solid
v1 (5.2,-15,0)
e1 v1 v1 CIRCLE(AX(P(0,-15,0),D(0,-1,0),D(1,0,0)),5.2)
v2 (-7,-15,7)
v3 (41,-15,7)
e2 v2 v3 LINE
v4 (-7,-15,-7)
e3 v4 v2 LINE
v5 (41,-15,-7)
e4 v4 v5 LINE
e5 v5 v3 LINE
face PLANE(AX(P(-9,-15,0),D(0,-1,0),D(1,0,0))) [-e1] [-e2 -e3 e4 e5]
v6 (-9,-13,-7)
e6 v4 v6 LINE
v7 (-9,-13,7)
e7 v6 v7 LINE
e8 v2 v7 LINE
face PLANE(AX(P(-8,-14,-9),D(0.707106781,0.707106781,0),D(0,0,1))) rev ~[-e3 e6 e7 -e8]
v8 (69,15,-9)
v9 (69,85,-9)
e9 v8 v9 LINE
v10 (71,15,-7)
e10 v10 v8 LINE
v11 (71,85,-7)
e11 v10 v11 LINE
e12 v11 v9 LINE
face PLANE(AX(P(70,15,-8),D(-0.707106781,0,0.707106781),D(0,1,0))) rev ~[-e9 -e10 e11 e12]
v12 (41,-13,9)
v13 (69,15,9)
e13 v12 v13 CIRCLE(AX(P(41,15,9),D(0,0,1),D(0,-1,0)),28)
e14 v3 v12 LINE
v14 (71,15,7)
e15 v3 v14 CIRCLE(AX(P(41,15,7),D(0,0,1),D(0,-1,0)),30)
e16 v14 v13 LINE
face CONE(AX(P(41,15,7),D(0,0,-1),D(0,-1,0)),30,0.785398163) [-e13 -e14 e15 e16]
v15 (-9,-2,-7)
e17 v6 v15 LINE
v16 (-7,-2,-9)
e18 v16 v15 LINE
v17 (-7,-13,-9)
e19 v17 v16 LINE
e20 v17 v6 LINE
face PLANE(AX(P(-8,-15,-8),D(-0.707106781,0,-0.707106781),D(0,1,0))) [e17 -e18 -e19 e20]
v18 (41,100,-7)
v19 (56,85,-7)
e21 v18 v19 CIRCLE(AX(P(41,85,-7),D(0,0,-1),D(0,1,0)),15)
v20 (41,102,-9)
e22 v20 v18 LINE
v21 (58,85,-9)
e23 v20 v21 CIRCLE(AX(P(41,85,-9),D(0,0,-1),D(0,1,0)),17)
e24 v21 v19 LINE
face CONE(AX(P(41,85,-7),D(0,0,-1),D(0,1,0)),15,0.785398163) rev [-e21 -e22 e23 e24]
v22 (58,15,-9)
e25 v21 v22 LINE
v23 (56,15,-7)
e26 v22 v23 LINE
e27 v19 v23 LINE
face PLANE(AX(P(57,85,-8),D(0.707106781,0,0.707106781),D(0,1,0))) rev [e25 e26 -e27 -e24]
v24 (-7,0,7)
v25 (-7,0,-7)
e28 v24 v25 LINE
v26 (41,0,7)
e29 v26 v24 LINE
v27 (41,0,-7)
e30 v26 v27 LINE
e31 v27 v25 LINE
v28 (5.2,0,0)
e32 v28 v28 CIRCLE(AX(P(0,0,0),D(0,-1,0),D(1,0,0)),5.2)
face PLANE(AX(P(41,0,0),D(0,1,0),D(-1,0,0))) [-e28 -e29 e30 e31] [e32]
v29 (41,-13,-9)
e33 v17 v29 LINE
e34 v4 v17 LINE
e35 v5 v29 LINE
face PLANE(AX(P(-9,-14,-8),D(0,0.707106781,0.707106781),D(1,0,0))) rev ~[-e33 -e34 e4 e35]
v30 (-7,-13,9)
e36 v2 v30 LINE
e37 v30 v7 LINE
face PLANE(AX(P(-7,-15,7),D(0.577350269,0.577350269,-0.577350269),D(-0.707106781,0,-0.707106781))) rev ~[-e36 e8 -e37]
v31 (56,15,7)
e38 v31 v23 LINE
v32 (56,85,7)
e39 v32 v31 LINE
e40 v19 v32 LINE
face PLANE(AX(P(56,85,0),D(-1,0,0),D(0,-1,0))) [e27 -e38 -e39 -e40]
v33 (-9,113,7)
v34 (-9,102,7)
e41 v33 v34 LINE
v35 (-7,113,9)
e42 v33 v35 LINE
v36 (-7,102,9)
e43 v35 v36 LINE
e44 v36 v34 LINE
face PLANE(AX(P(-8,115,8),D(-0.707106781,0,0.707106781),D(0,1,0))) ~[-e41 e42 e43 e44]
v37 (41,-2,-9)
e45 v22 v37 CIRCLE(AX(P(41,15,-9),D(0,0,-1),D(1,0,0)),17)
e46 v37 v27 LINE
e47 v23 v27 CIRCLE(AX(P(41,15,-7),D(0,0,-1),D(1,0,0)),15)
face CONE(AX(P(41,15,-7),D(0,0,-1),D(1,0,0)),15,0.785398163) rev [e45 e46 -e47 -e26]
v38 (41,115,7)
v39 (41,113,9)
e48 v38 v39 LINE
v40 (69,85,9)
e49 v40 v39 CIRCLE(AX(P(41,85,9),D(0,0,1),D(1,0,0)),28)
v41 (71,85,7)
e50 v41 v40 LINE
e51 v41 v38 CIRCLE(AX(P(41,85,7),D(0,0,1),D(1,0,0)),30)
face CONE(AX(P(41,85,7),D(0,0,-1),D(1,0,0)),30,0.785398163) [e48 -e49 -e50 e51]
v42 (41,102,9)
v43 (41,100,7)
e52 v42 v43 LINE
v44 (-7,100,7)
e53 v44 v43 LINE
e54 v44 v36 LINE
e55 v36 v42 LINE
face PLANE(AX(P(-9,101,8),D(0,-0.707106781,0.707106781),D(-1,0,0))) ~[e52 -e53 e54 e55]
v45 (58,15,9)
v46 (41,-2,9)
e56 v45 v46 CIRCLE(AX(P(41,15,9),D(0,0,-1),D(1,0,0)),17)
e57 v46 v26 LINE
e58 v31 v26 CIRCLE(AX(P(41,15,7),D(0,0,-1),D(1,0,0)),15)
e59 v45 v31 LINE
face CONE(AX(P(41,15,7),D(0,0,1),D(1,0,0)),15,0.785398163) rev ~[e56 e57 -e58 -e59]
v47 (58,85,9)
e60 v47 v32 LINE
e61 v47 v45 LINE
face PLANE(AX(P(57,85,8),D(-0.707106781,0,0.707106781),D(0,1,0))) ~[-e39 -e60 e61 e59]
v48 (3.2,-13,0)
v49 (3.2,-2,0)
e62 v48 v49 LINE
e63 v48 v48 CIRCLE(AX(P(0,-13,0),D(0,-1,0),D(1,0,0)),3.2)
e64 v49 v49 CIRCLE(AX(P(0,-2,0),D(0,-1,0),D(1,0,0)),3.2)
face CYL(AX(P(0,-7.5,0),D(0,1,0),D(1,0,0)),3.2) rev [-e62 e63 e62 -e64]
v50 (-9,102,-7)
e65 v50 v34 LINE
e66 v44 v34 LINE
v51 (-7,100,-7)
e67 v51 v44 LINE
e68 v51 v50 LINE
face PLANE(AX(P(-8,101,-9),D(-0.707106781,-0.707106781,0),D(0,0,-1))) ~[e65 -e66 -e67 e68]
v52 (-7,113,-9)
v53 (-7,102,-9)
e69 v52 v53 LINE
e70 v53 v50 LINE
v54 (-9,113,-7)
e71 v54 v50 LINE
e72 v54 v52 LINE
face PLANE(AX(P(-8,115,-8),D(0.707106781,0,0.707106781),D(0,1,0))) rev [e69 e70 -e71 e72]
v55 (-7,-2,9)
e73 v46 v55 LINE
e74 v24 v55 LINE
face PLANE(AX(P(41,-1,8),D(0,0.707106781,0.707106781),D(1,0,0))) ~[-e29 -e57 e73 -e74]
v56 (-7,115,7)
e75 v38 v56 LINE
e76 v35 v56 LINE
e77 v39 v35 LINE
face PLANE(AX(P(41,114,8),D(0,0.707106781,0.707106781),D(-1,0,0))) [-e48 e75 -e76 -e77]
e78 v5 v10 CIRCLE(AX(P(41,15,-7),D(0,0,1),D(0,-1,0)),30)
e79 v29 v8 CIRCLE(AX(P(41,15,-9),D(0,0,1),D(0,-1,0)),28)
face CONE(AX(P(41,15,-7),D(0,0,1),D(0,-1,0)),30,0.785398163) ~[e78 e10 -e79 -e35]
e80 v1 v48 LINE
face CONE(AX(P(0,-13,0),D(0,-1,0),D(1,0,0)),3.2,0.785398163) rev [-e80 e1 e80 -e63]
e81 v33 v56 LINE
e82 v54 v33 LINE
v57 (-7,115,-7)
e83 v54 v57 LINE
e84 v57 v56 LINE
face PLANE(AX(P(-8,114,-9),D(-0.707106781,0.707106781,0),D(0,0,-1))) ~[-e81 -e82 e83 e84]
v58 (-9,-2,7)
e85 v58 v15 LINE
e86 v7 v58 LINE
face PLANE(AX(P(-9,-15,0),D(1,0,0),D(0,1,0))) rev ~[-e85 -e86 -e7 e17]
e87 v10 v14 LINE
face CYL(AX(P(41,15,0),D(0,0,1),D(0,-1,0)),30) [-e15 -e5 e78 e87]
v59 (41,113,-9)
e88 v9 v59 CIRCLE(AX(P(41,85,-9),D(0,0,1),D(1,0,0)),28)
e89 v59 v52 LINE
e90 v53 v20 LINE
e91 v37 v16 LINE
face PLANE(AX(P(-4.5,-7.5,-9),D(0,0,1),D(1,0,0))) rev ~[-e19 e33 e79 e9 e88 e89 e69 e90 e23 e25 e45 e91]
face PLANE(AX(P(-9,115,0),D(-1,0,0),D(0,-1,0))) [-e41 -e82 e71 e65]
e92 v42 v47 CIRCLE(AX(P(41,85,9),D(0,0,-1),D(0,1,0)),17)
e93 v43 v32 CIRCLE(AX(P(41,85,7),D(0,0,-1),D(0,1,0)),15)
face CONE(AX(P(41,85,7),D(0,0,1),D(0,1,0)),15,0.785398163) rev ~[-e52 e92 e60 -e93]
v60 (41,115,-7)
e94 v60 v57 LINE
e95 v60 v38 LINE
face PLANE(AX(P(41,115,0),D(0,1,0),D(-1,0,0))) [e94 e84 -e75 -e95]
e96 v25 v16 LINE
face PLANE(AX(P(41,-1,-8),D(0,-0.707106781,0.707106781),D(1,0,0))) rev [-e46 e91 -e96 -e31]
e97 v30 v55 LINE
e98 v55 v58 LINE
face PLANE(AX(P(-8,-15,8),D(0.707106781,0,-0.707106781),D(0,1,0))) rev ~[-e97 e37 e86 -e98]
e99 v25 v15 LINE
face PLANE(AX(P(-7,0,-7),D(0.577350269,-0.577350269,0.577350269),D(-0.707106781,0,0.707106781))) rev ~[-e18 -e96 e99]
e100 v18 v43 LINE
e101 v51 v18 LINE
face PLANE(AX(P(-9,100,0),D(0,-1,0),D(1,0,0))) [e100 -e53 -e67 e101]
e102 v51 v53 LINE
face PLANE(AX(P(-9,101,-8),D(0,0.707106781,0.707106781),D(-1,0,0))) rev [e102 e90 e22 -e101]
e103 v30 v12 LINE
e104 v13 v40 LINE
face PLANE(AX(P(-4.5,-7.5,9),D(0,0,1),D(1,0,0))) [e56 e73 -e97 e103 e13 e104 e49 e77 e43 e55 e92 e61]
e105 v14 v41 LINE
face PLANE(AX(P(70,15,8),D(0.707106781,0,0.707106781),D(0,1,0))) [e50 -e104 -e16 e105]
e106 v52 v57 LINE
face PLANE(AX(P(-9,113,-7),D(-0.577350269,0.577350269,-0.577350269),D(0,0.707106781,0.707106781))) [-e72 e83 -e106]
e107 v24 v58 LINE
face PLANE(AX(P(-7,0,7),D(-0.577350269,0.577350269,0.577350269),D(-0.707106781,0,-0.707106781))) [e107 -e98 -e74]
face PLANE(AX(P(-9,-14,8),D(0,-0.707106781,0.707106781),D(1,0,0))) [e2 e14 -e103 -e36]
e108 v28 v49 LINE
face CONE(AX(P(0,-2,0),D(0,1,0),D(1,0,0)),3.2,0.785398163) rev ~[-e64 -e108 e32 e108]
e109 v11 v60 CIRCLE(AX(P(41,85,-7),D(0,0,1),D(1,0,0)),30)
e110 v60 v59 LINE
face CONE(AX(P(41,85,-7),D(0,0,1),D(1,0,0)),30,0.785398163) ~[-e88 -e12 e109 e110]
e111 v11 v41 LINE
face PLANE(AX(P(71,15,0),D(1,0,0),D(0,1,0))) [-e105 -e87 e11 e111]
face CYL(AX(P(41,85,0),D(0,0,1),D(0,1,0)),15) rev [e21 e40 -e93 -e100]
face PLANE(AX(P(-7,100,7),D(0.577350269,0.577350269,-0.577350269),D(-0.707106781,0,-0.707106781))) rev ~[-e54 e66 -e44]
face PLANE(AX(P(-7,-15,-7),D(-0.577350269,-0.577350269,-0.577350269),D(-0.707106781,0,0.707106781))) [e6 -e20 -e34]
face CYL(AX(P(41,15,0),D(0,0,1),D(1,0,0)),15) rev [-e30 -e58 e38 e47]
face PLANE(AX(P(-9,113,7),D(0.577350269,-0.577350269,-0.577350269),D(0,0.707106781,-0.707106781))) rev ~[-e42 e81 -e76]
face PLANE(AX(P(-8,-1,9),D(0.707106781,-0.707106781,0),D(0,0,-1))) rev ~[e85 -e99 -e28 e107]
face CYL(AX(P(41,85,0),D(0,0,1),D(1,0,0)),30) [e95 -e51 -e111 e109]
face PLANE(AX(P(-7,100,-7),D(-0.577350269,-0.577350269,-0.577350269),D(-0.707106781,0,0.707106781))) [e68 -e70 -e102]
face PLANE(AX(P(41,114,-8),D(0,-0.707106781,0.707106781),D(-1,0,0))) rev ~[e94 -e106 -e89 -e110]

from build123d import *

# Parameters (mm, degrees)
F0_W     = 9
F0_H     = 15
F0_W_2   = 3.2
F1_DEPTH = 9
F3_SIZE  = 2


# Not quite as in the source:
# - a feature names something its author has since deleted; it is built from what else it names


with BuildPart() as f1:
    # F0 (on Top) → F1 (new body, symmetric)
    with BuildSketch(Plane.XY):
        with Locations((-4.5, -7.5)):
            Rectangle(F0_W, F0_H)
        with Locations((1.6, -7.5)):
            Rectangle(F0_W_2, F0_H)
        with BuildLine():
            Line((41, 0), (3.2, 0))
            Line((3.2, 0), (3.2, -15))
            Line((3.2, -15), (41, -15))
            ThreePointArc((41, -15), (62.2132034356, -6.2132034356), (71, 15))
            Line((71, 15), (71, 85))
            ThreePointArc((71, 85), (62.2132034356, 106.2132034356), (41, 115))
            Line((41, 115), (-9, 115))
            Line((-9, 115), (-9, 100))
            Line((-9, 100), (41, 100))
            ThreePointArc((41, 100), (51.6066017178, 95.6066017178), (56, 85))
            Line((56, 85), (56, 15))
            ThreePointArc((56, 15), (51.6066017178, 4.3933982822), (41, 0))
        make_face()
    extrude(amount=F1_DEPTH, both=True)

    # F0 (on Top) → F2 (revolve, cut)
    with BuildSketch(Plane.XY):
        with Locations((1.6, -7.5)):
            Rectangle(F0_W_2, F0_H)
    revolve(axis=Axis((0, -7.5, 0), (0, -1, 0)), mode=Mode.SUBTRACT)

    # F3
    f3_edges = [f1.edges().sort_by_distance(p)[0] for p in [
        (-9, -7.5, 9),
        (16, -15, 9),
        (62.213203, -6.213203, 9),
        (71, 50, 9),
        (62.213203, 106.213203, 9),
        (16, 115, 9),
        (-9, 107.5, 9),
        (16, 100, 9),
        (51.606602, 95.606602, 9),
        (56, 50, 9),
        (51.606602, 4.393398, 9),
        (16, 0, 9),
        (-9, -7.5, -9),
        (16, -15, -9),
        (62.213203, -6.213203, -9),
        (71, 50, -9),
        (62.213203, 106.213203, -9),
        (16, 115, -9),
        (-9, 107.5, -9),
        (16, 100, -9),
        (51.606602, 95.606602, -9),
        (56, 50, -9),
        (51.606602, 4.393398, -9),
        (16, 0, -9),
        (-9, -15, 0),
        (-9, 0, 0),
        (-9, 115, 0),
        (-9, 100, 0),
        (-3.2, -15, 0),
        (-3.2, 0, 0),
    ]]
    chamfer(f3_edges, length=F3_SIZE)


solid = f1.part
